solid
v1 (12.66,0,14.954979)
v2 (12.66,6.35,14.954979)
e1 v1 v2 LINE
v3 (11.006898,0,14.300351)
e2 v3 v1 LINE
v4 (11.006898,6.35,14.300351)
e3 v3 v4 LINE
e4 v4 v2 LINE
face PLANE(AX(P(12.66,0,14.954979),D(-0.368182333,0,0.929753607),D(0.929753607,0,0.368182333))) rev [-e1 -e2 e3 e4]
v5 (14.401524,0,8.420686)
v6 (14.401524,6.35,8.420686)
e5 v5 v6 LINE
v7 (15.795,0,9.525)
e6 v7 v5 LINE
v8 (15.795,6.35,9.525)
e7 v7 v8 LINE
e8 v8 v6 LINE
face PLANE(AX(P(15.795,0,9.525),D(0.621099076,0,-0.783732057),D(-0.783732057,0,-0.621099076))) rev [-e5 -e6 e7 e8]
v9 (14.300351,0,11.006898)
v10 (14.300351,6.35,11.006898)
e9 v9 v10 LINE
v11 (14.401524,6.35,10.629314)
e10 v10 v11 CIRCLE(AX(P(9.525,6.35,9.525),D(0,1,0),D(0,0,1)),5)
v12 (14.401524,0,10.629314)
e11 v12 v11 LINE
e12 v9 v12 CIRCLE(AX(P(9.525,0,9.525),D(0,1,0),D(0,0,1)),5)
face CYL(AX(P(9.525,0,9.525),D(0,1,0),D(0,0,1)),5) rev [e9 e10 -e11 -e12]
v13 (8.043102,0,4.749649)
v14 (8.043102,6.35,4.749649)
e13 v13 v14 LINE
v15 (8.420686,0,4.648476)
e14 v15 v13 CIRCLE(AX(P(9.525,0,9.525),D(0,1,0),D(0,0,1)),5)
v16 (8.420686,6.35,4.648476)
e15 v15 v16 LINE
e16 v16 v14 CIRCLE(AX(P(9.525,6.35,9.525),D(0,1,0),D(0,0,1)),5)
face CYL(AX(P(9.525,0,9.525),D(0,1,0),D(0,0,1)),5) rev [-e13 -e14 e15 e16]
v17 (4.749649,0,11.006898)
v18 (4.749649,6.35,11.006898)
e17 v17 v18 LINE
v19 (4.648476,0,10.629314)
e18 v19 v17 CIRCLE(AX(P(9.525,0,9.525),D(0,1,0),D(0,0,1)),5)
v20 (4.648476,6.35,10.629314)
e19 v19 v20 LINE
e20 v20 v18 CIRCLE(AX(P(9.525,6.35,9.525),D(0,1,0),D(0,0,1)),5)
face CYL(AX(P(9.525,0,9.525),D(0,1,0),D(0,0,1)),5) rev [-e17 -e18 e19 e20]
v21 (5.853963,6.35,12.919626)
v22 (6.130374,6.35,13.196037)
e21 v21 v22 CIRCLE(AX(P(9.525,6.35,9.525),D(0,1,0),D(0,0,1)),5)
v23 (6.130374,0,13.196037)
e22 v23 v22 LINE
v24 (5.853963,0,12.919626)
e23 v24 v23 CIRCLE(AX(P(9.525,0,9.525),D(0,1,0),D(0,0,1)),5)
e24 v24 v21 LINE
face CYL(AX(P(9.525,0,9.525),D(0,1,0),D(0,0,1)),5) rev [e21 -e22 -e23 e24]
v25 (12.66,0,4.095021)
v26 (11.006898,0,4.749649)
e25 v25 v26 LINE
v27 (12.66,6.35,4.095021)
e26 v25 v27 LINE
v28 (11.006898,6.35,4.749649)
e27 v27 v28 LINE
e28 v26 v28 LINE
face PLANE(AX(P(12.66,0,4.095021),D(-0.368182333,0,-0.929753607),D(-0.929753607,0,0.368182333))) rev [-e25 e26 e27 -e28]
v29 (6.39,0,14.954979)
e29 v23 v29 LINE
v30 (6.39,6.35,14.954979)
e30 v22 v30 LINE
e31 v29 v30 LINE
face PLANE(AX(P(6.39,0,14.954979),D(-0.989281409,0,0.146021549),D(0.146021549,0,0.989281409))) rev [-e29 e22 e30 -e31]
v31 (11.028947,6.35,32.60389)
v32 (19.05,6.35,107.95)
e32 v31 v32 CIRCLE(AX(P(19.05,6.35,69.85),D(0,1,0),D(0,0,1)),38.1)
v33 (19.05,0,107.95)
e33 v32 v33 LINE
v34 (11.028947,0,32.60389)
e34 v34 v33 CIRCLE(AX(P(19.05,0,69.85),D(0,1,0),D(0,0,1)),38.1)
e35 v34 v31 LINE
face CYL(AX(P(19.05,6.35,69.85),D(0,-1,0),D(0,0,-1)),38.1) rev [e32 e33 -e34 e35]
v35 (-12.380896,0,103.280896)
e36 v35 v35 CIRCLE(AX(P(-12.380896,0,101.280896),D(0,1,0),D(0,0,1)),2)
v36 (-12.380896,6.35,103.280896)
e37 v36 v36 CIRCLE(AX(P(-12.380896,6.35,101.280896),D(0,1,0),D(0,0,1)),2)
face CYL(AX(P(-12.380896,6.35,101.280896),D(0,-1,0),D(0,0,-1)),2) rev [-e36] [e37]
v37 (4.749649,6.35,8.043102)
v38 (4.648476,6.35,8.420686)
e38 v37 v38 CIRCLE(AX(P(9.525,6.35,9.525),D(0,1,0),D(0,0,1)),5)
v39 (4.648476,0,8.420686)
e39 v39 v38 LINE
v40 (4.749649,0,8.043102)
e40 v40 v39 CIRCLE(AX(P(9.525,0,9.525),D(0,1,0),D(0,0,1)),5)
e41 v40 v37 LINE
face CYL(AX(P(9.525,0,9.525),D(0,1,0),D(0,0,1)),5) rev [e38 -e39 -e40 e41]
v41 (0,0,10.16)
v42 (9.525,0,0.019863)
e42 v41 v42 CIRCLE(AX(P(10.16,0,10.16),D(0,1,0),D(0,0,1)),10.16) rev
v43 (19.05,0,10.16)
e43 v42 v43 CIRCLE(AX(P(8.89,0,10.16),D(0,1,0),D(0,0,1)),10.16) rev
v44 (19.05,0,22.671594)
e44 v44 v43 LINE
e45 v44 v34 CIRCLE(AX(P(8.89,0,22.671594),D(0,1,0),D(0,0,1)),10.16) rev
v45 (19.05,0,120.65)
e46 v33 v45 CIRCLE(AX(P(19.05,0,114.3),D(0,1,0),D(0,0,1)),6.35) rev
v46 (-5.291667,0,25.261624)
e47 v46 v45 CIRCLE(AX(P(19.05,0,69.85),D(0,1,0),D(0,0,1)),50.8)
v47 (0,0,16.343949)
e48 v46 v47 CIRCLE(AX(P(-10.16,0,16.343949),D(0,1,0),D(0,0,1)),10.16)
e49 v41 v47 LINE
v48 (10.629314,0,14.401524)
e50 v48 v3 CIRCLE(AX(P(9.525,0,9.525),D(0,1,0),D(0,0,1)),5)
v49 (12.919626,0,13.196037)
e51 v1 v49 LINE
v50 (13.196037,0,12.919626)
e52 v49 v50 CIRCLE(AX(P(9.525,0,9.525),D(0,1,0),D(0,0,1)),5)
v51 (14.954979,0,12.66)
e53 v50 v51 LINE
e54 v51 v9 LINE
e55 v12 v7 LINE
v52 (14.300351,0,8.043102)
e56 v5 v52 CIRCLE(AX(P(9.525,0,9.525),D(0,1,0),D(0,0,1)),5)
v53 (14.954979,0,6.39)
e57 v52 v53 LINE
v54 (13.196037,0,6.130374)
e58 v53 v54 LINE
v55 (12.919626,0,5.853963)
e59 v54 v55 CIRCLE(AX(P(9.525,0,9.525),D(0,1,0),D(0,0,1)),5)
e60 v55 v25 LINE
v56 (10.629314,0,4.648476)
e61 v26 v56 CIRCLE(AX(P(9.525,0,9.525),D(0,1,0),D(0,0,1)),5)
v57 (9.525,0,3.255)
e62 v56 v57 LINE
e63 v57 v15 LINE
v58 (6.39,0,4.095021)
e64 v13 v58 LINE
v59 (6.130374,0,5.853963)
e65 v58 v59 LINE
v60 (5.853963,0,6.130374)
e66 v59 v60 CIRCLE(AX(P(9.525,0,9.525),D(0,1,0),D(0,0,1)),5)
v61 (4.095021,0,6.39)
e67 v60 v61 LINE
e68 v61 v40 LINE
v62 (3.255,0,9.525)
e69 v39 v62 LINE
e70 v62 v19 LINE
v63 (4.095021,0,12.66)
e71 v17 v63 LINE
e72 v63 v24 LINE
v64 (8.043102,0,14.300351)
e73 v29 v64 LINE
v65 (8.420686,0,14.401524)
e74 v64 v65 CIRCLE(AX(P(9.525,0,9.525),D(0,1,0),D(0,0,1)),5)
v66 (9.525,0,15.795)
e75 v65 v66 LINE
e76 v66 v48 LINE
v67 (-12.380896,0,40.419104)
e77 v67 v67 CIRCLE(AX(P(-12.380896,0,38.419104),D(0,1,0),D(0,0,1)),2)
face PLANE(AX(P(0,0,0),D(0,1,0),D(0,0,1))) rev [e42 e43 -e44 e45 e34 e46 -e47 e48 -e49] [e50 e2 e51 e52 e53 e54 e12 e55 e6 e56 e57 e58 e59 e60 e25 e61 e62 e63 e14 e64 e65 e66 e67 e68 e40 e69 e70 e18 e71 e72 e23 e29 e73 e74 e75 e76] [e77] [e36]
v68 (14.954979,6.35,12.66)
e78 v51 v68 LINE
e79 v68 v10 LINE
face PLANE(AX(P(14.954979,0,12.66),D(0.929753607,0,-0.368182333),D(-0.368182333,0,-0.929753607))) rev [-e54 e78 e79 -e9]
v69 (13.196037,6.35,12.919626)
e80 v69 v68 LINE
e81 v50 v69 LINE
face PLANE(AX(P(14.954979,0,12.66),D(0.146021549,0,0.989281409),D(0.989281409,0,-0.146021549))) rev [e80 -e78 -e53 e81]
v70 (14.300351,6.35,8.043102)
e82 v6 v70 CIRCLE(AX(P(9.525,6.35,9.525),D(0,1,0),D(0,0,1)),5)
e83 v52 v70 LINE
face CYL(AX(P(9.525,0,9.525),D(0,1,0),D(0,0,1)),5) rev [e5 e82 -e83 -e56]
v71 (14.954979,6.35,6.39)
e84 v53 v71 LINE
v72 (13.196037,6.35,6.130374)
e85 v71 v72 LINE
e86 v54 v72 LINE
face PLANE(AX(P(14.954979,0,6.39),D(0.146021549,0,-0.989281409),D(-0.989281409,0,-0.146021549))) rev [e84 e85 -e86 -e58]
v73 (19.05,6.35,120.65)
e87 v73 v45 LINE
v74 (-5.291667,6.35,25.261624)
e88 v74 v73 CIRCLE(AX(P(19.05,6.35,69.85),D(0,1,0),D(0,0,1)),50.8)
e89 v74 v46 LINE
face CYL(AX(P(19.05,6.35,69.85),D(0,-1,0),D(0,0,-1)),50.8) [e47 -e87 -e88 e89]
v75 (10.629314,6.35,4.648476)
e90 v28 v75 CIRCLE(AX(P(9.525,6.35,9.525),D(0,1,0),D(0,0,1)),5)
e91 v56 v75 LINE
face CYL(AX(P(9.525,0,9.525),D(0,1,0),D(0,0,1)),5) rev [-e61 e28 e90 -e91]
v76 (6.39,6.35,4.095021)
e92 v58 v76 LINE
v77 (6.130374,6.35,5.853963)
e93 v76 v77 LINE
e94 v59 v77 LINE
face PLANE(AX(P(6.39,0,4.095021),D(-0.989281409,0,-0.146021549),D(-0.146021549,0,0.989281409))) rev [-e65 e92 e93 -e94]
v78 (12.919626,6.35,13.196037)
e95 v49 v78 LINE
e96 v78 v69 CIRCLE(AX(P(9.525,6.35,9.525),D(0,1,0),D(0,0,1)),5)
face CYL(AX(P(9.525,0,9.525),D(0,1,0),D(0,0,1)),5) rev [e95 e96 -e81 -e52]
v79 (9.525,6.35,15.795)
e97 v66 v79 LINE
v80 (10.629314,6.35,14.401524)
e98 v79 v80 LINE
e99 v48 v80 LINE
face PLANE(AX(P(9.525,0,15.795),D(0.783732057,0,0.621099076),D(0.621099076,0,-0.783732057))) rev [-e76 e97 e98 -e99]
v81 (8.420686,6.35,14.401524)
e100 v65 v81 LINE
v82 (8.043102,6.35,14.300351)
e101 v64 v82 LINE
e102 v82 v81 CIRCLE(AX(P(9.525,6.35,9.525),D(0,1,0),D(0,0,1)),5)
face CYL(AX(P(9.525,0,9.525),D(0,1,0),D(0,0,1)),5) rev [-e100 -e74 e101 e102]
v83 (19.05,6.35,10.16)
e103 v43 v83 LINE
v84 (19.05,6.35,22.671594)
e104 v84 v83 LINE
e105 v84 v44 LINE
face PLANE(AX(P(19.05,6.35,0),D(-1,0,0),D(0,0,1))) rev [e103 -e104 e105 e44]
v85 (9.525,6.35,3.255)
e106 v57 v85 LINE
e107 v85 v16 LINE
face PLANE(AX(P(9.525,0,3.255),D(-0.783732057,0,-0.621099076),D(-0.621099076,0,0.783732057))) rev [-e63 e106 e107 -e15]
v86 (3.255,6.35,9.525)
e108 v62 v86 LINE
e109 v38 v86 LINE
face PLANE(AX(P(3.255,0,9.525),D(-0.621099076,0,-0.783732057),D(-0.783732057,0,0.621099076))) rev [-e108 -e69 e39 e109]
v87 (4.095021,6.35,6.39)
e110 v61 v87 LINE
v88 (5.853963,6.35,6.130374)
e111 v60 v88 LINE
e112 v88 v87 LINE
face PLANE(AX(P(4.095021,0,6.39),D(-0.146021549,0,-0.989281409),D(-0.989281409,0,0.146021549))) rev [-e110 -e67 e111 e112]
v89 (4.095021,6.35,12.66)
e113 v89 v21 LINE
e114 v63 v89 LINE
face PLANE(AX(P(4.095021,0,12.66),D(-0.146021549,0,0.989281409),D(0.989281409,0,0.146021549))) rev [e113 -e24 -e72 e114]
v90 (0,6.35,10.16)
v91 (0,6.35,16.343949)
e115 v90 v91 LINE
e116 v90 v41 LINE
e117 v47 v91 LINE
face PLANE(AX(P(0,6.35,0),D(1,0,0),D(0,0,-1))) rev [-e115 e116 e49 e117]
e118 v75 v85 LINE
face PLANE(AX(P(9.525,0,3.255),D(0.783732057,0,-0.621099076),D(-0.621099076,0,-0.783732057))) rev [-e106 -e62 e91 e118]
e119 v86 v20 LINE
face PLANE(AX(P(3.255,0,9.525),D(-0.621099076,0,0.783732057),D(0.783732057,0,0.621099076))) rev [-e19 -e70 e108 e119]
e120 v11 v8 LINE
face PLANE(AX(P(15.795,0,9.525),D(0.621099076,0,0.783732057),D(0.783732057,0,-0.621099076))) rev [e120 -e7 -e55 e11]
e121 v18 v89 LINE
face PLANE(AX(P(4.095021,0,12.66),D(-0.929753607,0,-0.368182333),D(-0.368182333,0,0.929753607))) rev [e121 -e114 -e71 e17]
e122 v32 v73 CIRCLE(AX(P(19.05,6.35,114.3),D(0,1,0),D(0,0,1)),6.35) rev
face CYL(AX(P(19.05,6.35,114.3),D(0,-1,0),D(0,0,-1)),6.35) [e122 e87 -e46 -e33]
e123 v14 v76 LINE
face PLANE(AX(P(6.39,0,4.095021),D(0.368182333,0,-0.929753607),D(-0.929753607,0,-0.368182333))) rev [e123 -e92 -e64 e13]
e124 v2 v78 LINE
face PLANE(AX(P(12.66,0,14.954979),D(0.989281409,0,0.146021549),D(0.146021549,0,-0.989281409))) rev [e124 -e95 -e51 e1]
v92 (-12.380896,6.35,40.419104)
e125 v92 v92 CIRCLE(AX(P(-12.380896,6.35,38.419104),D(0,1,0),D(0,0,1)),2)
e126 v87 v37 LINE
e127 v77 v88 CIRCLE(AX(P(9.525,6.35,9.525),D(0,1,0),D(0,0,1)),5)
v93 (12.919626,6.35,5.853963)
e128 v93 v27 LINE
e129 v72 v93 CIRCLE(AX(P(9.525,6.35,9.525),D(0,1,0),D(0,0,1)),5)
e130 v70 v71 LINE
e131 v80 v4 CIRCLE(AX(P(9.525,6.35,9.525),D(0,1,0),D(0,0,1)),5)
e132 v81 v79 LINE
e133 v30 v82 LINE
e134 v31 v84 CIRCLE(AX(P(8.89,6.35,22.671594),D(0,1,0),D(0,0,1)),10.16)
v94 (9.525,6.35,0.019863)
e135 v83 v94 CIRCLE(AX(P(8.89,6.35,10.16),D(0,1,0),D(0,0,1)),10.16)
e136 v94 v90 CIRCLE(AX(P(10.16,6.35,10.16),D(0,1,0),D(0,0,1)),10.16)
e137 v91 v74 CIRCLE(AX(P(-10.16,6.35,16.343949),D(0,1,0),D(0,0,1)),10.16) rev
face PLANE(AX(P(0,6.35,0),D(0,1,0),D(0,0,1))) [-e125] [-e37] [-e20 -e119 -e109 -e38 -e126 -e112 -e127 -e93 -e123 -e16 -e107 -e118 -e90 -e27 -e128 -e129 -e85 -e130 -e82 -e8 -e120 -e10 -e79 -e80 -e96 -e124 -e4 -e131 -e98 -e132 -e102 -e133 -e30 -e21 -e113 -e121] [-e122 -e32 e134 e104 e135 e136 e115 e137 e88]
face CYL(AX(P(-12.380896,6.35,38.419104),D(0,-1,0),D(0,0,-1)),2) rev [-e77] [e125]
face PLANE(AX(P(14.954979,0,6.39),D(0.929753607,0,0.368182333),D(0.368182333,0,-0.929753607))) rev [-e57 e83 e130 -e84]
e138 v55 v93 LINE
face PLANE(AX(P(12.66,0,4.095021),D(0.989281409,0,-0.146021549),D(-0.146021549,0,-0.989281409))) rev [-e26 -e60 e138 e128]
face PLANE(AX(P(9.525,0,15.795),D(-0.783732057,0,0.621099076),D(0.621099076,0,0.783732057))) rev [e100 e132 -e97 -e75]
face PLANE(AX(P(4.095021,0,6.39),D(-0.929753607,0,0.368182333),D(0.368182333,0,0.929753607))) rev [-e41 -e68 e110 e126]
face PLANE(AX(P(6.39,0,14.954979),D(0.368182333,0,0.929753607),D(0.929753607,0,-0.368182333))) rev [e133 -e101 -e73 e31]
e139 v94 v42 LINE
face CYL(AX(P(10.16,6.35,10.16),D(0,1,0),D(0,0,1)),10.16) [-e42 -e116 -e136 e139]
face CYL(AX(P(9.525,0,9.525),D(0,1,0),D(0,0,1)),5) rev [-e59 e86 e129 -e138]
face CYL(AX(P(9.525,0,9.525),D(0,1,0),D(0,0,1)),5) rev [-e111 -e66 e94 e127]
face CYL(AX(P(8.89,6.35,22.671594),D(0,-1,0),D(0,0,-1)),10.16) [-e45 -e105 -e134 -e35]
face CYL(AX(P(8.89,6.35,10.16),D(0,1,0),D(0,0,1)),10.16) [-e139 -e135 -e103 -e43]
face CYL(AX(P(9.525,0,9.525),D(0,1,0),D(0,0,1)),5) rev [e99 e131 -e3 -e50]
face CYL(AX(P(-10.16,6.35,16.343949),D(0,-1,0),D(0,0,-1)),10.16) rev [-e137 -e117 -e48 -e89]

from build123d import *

# Parameters (mm, degrees)
SKETCH1_R           = 3
SKETCH1_R_2         = 2
BOSS_EXTRUDE1_DEPTH = 6.35
FILLET1_R           = 10.16
CUT_EXTRUDE1_DEPTH  = 125.919203888


with BuildPart() as part:
    # Sketch1 → Boss-Extrude1 (new body)
    with BuildSketch(Plane(origin=(0, 0, 0), x_dir=(1, 0, 0), z_dir=(0, 1, 0))):
        with BuildLine():
            Line((19.05, 0), (0, 0))
            Line((0, 0), (0, -22.757139607))
            ThreePointArc((0, -22.757139607), (-30.814603217, -79.553676933), (19.05, -120.65))
            ThreePointArc((19.05, -120.65), (25.4, -114.3), (19.05, -107.95))
            ThreePointArc((19.05, -107.95), (-19.05, -69.85), (19.05, -31.75))
            Line((19.05, -31.75), (19.05, 0))
        make_face()
        with Locations(Location((9.525, -9.525, 0), (0, 0, 270))):
            Circle(SKETCH1_R, mode=Mode.SUBTRACT)
        with Locations(Location((-12.380896424, -38.419103576, 0), (0, 0, 270))):
            Circle(SKETCH1_R_2, mode=Mode.SUBTRACT)
        with Locations(Location((-12.380896424, -101.280896424, 0), (0, 0, 270))):
            Circle(SKETCH1_R_2, mode=Mode.SUBTRACT)
    extrude(amount=BOSS_EXTRUDE1_DEPTH)

    # Fillet1
    # the kernel refuses this fillet: 10.16 mm, written as the material it adds along each edge
    with BuildSketch(Plane(origin=(0, 0, 22.757139607), x_dir=(0, 0, -1), z_dir=(0, 1, 0))) as fillet1_piece_1:
        with BuildLine():
            CenterArc((6.413190667, 10.16), FILLET1_R, 208.630989837, 61.369010163)
            ThreePointArc((-2.50448451, 5.291666667), (-1.175949507, 2.681941807), (0, 0))
            Line((0, 0), (6.413190667, 0))
        make_face()
    extrude(amount=6.35)
    # the kernel refuses this fillet: 10.16 mm, written as the material it takes off along each edge
    with BuildSketch(Plane(origin=(19.05, -22.696015193, 31.75), x_dir=(0, 0, -1), z_dir=(0, 1, 0))) as fillet1_2_piece_1:
        with BuildLine():
            CenterArc((9.078406077, 10.16), FILLET1_R, 192.153197469, 77.846802531)
            ThreePointArc((-0.853889939, 8.021052632), (-0.214073897, 4.033187739), (0, 0))
            Line((0, 0), (9.078406077, 0))
        make_face()
    extrude(amount=51.742030387, mode=Mode.SUBTRACT)
    with BuildSketch(Plane(origin=(0, -25.4, 0), x_dir=(1, 0, 0), z_dir=(0, 1, 0)), Plane(origin=(19.05, -25.4, 0), x_dir=(0, 0, 1), z_dir=(0, 1, 0))) as fillet1_2_piece_2:
        with BuildLine():
            CenterArc((FILLET1_R, -FILLET1_R), FILLET1_R, 90, 90)
            Line((0, -FILLET1_R), (0, 0))
            Line((0, 0), (FILLET1_R, 0))
        make_face()
    extrude(amount=57.15, mode=Mode.SUBTRACT)

    # Sketch2 → Cut-Extrude1 (cut, through all)
    with BuildSketch(Plane(origin=(0, 6.35, 0), x_dir=(1, 0, 0), z_dir=(0, 1, 0))):
        with BuildLine():
            Line((9.525, -3.255), (10.629314157, -4.648475598))
            ThreePointArc((10.629314157, -4.648475598), (10.819095226, -4.695370869), (11.006898087, -4.749648907))
            Line((11.006898087, -4.749648907), (12.66, -4.095020718))
            Line((12.66, -4.095020718), (12.919626315, -5.853963064))
            ThreePointArc((12.919626315, -5.853963064), (13.060533906, -5.989466094), (13.196036936, -6.130373685))
            Line((13.196036936, -6.130373685), (14.954979282, -6.39))
            Line((14.954979282, -6.39), (14.300351093, -8.043101913))
            ThreePointArc((14.300351093, -8.043101913), (14.354629131, -8.230904774), (14.401524402, -8.420685843))
            Line((14.401524402, -8.420685843), (15.795, -9.525))
            Line((15.795, -9.525), (14.401524402, -10.629314157))
            ThreePointArc((14.401524402, -10.629314157), (14.354629131, -10.819095226), (14.300351093, -11.006898087))
            Line((14.300351093, -11.006898087), (14.954979282, -12.66))
            Line((14.954979282, -12.66), (13.196036936, -12.919626315))
            ThreePointArc((13.196036936, -12.919626315), (13.060533906, -13.060533906), (12.919626315, -13.196036936))
            Line((12.919626315, -13.196036936), (12.66, -14.954979282))
            Line((12.66, -14.954979282), (11.006898087, -14.300351093))
            ThreePointArc((11.006898087, -14.300351093), (10.819095226, -14.354629131), (10.629314157, -14.401524402))
            Line((10.629314157, -14.401524402), (9.525, -15.795))
            Line((9.525, -15.795), (8.420685843, -14.401524402))
            ThreePointArc((8.420685843, -14.401524402), (8.230904774, -14.354629131), (8.043101913, -14.300351093))
            Line((8.043101913, -14.300351093), (6.39, -14.954979282))
            Line((6.39, -14.954979282), (6.130373685, -13.196036936))
            ThreePointArc((6.130373685, -13.196036936), (5.989466094, -13.060533906), (5.853963064, -12.919626315))
            Line((5.853963064, -12.919626315), (4.095020718, -12.66))
            Line((4.095020718, -12.66), (4.749648907, -11.006898087))
            ThreePointArc((4.749648907, -11.006898087), (4.695370869, -10.819095226), (4.648475598, -10.629314157))
            Line((4.648475598, -10.629314157), (3.255, -9.525))
            Line((3.255, -9.525), (4.648475598, -8.420685843))
            ThreePointArc((4.648475598, -8.420685843), (4.695370869, -8.230904774), (4.749648907, -8.043101913))
            Line((4.749648907, -8.043101913), (4.095020718, -6.39))
            Line((4.095020718, -6.39), (5.853963064, -6.130373685))
            ThreePointArc((5.853963064, -6.130373685), (5.989466094, -5.989466094), (6.130373685, -5.853963064))
            Line((6.130373685, -5.853963064), (6.39, -4.095020718))
            Line((6.39, -4.095020718), (8.043101913, -4.749648907))
            ThreePointArc((8.043101913, -4.749648907), (8.230904774, -4.695370869), (8.420685843, -4.648475598))
            Line((8.420685843, -4.648475598), (9.525, -3.255))
        make_face()
    extrude(amount=-CUT_EXTRUDE1_DEPTH, mode=Mode.SUBTRACT)


solid = part.part
